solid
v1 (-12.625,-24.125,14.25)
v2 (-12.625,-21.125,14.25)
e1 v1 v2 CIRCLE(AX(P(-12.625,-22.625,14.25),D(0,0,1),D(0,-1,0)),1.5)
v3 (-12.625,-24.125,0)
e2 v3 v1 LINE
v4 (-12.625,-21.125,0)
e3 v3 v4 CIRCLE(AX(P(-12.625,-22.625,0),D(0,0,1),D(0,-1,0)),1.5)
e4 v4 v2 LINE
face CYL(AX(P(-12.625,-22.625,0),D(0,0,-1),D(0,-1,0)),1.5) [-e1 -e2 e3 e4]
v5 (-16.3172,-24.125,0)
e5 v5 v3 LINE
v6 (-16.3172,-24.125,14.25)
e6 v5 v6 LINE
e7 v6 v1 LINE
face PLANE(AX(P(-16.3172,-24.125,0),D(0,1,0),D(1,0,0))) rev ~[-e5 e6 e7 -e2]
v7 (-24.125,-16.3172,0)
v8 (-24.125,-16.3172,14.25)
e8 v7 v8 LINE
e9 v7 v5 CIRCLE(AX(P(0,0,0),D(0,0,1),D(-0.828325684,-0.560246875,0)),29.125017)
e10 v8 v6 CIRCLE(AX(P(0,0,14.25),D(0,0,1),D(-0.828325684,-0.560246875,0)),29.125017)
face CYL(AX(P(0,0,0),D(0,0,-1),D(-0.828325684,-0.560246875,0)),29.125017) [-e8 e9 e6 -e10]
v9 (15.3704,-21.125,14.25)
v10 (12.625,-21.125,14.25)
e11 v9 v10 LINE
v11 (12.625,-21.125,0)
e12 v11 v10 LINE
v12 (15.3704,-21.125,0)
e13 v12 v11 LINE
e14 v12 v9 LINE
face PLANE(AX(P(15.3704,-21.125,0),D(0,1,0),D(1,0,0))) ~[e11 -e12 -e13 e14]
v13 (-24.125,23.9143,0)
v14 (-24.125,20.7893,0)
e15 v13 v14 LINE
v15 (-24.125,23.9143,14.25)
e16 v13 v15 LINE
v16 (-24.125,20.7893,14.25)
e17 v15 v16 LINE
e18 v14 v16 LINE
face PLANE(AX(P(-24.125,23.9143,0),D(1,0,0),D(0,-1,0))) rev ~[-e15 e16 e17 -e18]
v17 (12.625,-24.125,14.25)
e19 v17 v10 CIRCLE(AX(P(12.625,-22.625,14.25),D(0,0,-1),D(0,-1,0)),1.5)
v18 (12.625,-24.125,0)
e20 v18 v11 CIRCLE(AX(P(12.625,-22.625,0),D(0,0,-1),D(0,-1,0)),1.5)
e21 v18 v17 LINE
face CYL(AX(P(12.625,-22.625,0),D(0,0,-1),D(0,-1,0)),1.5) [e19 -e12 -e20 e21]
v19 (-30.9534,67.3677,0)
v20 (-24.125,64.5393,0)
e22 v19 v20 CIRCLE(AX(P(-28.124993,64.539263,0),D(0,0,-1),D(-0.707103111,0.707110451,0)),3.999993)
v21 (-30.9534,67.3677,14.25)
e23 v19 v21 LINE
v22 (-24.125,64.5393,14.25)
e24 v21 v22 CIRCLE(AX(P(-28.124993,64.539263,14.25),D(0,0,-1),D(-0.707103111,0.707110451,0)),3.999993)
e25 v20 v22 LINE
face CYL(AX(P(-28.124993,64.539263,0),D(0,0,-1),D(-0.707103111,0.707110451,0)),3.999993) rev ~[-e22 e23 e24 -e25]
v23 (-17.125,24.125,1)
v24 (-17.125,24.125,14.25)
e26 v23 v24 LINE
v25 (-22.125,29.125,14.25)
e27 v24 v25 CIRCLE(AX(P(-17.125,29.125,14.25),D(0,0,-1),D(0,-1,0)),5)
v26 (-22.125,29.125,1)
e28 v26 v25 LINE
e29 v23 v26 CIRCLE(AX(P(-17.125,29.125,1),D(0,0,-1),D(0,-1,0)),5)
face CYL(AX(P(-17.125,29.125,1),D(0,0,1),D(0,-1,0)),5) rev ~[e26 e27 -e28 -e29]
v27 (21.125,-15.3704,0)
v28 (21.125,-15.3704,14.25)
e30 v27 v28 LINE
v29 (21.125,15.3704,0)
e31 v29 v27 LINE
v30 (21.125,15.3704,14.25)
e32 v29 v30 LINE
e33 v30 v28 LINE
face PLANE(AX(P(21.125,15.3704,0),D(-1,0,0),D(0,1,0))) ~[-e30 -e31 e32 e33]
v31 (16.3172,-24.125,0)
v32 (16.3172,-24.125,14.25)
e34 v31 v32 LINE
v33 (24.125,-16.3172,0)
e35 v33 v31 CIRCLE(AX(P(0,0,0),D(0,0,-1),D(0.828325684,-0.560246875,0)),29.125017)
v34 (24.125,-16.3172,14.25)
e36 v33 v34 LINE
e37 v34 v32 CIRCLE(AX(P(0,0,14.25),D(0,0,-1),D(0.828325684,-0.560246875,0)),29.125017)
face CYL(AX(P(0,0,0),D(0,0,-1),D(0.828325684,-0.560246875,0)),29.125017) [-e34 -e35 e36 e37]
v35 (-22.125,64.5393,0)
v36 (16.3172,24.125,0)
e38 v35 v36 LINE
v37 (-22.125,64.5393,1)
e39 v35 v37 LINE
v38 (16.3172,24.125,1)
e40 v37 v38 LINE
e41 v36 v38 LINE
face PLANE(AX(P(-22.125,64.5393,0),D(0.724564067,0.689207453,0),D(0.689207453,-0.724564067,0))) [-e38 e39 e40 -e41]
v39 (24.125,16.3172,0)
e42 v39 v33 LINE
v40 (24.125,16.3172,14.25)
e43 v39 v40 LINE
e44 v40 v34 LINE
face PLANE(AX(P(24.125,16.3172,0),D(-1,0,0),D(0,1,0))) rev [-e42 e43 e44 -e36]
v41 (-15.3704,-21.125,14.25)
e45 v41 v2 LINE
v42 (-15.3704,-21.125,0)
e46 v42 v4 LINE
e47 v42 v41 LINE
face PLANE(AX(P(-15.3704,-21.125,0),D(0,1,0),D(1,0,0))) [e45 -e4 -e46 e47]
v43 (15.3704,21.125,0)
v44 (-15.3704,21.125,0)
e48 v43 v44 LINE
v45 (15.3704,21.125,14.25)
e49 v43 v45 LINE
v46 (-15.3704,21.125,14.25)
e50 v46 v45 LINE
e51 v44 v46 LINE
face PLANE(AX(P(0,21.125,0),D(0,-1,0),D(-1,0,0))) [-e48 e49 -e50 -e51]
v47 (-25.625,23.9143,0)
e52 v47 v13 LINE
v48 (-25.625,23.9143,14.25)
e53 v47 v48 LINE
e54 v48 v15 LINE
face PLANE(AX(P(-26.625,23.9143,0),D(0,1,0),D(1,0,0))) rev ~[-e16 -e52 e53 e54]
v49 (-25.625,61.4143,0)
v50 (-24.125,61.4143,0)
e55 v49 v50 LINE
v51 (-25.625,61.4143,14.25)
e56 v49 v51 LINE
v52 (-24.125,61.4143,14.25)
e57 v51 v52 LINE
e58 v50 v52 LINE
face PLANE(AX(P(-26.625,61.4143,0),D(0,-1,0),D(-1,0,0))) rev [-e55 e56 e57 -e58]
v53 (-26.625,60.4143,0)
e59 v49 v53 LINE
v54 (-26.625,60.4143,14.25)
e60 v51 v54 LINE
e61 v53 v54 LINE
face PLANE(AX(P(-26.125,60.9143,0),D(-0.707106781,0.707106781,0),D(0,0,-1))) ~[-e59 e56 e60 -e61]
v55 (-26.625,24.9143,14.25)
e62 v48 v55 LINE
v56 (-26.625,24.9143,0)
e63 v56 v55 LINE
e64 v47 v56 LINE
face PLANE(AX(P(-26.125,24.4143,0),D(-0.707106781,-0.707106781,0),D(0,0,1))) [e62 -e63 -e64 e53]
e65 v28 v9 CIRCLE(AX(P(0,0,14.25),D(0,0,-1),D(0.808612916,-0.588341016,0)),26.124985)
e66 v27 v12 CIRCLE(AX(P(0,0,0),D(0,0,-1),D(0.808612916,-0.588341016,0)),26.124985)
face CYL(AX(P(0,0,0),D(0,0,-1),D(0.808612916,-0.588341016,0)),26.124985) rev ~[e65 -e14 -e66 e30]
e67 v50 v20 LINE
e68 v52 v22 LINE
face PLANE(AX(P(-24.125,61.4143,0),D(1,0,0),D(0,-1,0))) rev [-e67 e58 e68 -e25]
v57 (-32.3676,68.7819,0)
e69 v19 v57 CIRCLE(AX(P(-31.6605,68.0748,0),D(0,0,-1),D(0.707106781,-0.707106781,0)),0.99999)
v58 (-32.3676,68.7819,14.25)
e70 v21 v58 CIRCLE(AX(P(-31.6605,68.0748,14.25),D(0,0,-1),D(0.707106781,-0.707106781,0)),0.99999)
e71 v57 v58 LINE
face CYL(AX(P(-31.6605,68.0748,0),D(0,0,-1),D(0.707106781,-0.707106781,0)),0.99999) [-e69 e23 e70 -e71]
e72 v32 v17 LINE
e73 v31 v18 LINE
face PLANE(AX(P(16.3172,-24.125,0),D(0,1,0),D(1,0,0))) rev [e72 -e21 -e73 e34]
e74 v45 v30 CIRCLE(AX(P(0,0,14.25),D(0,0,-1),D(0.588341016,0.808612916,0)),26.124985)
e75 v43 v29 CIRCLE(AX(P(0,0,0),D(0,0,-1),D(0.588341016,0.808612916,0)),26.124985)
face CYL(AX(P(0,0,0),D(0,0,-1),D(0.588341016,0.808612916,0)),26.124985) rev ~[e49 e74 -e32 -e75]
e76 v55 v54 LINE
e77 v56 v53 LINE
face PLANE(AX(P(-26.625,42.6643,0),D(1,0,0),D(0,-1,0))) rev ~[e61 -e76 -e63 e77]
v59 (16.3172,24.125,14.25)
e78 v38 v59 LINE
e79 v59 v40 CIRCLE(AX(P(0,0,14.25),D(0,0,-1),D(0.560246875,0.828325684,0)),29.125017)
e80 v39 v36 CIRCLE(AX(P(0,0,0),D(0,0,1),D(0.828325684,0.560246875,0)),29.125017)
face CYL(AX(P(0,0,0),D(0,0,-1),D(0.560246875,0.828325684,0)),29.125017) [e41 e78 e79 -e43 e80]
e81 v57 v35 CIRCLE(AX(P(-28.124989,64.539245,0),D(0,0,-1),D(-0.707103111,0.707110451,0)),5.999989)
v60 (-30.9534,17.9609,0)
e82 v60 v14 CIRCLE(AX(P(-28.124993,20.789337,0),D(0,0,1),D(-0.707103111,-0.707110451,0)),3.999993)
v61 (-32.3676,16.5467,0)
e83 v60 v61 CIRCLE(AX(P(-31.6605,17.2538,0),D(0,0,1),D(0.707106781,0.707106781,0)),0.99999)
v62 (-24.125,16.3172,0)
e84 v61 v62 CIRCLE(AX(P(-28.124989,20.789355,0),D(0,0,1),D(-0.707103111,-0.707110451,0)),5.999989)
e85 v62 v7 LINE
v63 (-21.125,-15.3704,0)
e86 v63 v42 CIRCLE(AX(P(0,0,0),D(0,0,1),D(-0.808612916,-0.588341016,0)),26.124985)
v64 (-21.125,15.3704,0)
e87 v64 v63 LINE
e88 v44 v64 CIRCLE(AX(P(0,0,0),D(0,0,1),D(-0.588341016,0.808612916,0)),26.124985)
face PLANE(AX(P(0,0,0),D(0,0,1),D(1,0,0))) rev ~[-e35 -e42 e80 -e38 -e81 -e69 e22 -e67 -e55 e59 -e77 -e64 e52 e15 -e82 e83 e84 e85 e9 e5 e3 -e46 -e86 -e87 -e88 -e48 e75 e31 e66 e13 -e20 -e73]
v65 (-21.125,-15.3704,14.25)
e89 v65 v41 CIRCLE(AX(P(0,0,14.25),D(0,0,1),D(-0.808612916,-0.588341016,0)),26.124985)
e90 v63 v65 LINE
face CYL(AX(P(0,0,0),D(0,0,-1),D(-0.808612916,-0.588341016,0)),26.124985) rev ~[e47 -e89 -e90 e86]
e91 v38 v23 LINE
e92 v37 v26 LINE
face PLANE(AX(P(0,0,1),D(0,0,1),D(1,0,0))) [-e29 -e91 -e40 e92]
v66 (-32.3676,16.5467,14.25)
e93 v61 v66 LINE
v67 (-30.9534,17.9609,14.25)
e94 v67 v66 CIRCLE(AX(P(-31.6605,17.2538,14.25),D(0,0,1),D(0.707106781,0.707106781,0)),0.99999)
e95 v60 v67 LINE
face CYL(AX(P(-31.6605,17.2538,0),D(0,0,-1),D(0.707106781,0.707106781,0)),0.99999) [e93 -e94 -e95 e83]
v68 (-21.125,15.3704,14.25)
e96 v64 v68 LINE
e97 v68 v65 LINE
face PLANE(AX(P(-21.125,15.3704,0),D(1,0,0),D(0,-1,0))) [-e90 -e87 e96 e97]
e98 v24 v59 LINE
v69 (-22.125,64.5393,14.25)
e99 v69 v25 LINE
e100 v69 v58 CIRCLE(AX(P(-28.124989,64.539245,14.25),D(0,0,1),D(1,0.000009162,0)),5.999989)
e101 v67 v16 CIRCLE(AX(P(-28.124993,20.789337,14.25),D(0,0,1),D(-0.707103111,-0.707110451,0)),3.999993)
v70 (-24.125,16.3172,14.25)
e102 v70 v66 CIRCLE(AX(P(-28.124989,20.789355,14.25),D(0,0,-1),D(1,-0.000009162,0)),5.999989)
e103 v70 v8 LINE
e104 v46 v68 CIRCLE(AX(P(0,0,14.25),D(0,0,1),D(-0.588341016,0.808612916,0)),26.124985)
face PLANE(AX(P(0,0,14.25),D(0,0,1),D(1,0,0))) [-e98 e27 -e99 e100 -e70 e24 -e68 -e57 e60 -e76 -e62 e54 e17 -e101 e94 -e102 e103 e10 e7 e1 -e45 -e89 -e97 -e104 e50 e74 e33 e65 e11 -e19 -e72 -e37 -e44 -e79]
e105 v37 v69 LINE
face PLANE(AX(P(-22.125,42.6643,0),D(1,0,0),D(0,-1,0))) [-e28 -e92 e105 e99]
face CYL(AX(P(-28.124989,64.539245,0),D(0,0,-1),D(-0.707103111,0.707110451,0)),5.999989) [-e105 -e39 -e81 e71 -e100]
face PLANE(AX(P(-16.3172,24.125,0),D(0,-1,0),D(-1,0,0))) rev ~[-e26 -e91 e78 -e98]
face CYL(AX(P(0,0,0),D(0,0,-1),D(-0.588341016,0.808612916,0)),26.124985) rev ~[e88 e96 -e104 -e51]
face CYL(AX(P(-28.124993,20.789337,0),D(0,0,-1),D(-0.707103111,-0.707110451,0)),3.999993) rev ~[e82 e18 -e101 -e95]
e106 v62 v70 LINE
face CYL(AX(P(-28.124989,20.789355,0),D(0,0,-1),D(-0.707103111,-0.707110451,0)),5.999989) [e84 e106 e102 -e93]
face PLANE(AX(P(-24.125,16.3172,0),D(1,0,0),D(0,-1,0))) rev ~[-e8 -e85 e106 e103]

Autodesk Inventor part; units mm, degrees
ref_plane "YZ Plane" through (0, 0, 0) normal (1, 0, 0) x (0, 1, 0)
ref_plane "XZ Plane" through (0, 0, 0) normal (0, 1, 0) x (-1, 0, 0)
ref_plane "XY Plane" through (0, 0, 0) normal (0, 0, 1) x (1, 0, 0)
sketch "Sketch1" plane through (0, 0, 0) normal (0, 0, 1) x (1, 0, 0)
  line L0 (-15.3704, -21.125) -> (-12.625, -21.125)
  line L1 (0, 21.125) -> (-15.3704, 21.125)
  line L2 (-21.125, 15.3704) -> (-21.125, -15.3704)
  arc A0 (-15.3704, 21.125) -> (-21.125, 15.3704) centre (0, 0) ccw
  arc A1 (-21.125, -15.3704) -> (-15.3704, -21.125) centre (0, 0) ccw
  line L3 (0, 21.125) -> (0, 24.125)
  line L4 (0, 24.125) -> (-16.3172, 24.125)
  arc A2 (-16.3172, 24.125) -> (-24.125, 16.3172) centre (0, 0) ccw
  line L5 (-24.125, 16.3172) -> (-24.125, -16.3172)
  arc A3 (-24.125, -16.3172) -> (-16.3172, -24.125) centre (0, 0) ccw
  line L6 (-16.3172, -24.125) -> (-12.625, -24.125)
  arc A4 (-12.625, -24.125) -> (-12.625, -21.125) centre (-12.625, -22.625) ccw
  line L7 (-26.625, 42.6643) -> (-26.625, 23.9143)
  line L8 (-26.625, 23.9143) -> (-24.125, 23.9143)
  line L9 (-24.125, 23.9143) -> (-24.125, 20.7893)
  arc A5 (-30.9534, 17.9609) -> (-24.125, 20.7893) centre (-28.125, 20.7893) ccw
  arc A6 (-30.9534, 17.9609) -> (-32.3676, 16.5467) centre (-31.6605, 17.2538) ccw
  arc A7 (-32.3676, 16.5467) -> (-22.125, 20.7893) centre (-28.125, 20.7893) ccw
  line L10 (-31.6605, 17.2538) -> (-28.125, 20.7893) construction
  line L11 (-26.625, 42.6643) -> (-22.125, 42.6643)
  line L12 (-22.125, 42.6643) -> (-22.125, 20.7893)
  line L13 (-16.3172, 24.125) -> (-22.125, 24.125)
  line L14 (-22.125, 42.6643) -> (-22.125, 64.5393)
  line L15 (-22.125, 64.5393) -> (16.3172, 24.125)
  line L16 (16.3172, 24.125) -> (0, 24.125)
  point P0 (-22.6762, 18.2771)
  dimension "d2" = 42.25
  dimension "d3" = 26.125
  dimension "d5" = 21.125
  dimension "d6" = 3
  dimension "d7" = 3
  dimension "d8" = 3
  dimension "d9" = 3
  dimension "d10" = 3
  dimension "d11" = 10
  dimension "d12" = 45
  dimension "d13" = 18.75
  dimension "d14" = 25.875
  dimension "d15" = 4
  dimension "d17" = 2
  dimension "d18" = 2.5
  dimension "d21" = 21.125
  dimension "d33" = 16.3172
  dimension "d34" = 16.3172
  dimension "d35" = 21.875
  dimension "d36" = 21.875
extrude "Extrusion1" add sketch "Sketch1" along normal blind 14.25 contours L0 A4 L6 A3 L5 A7 A2 L4 L3 L1 A0 L2 A1 | A2 A7
mirror "Mirror1" about plane through (0, 0, 0) normal (1, 0, 0)
extrude "Extrusion2" add sketch "Sketch1" along normal blind 14.25 separate body contours A7 A6 A5 L9 L8 L7 L11 L12 A2 | A2 A7
chamfer "Chamfer1" distance 1 angle 45 1 edges at (-26.625, 23.9143, 7.125)
mirror "Mirror2" about plane through (-22.125, 42.6643, 0) normal (0, 1, 0) bodies 2
extrude "Extrusion3" add sketch "Sketch1" along normal blind 1 contours L4 L13 L12 L14 L15 L16 bodies 2
extrude "Extrusion4" add sketch "Sketch1" along normal blind 14.25 contours A7 L12 L13 A2 bodies 2
combine bodies "Combine1" operation type add bodies to combine 2 1
fillet "Fillet1" radius 5 1 edges at (-22.125, 24.125, 7.625)
equation "\"d2\" = d0"
equation "\"d5\" = 0.5 * d2"
equation "\"d7\" = d6"
equation "\"d8\" = d6"
equation "\"d9\" = d6"
equation "\"d10\" = d6"
equation "\"d21\" = 0.5 * d0"
equation "\"d34\" = d33"
equation "\"d35\" = d36"
equation "\"d22\" = d19"
equation "\"d31\" = d19"
equation "\"d0\" = 42.25"
equation "\"d19\" = 14.25"
properties part number "Daiso Phone Printer Adapter"
